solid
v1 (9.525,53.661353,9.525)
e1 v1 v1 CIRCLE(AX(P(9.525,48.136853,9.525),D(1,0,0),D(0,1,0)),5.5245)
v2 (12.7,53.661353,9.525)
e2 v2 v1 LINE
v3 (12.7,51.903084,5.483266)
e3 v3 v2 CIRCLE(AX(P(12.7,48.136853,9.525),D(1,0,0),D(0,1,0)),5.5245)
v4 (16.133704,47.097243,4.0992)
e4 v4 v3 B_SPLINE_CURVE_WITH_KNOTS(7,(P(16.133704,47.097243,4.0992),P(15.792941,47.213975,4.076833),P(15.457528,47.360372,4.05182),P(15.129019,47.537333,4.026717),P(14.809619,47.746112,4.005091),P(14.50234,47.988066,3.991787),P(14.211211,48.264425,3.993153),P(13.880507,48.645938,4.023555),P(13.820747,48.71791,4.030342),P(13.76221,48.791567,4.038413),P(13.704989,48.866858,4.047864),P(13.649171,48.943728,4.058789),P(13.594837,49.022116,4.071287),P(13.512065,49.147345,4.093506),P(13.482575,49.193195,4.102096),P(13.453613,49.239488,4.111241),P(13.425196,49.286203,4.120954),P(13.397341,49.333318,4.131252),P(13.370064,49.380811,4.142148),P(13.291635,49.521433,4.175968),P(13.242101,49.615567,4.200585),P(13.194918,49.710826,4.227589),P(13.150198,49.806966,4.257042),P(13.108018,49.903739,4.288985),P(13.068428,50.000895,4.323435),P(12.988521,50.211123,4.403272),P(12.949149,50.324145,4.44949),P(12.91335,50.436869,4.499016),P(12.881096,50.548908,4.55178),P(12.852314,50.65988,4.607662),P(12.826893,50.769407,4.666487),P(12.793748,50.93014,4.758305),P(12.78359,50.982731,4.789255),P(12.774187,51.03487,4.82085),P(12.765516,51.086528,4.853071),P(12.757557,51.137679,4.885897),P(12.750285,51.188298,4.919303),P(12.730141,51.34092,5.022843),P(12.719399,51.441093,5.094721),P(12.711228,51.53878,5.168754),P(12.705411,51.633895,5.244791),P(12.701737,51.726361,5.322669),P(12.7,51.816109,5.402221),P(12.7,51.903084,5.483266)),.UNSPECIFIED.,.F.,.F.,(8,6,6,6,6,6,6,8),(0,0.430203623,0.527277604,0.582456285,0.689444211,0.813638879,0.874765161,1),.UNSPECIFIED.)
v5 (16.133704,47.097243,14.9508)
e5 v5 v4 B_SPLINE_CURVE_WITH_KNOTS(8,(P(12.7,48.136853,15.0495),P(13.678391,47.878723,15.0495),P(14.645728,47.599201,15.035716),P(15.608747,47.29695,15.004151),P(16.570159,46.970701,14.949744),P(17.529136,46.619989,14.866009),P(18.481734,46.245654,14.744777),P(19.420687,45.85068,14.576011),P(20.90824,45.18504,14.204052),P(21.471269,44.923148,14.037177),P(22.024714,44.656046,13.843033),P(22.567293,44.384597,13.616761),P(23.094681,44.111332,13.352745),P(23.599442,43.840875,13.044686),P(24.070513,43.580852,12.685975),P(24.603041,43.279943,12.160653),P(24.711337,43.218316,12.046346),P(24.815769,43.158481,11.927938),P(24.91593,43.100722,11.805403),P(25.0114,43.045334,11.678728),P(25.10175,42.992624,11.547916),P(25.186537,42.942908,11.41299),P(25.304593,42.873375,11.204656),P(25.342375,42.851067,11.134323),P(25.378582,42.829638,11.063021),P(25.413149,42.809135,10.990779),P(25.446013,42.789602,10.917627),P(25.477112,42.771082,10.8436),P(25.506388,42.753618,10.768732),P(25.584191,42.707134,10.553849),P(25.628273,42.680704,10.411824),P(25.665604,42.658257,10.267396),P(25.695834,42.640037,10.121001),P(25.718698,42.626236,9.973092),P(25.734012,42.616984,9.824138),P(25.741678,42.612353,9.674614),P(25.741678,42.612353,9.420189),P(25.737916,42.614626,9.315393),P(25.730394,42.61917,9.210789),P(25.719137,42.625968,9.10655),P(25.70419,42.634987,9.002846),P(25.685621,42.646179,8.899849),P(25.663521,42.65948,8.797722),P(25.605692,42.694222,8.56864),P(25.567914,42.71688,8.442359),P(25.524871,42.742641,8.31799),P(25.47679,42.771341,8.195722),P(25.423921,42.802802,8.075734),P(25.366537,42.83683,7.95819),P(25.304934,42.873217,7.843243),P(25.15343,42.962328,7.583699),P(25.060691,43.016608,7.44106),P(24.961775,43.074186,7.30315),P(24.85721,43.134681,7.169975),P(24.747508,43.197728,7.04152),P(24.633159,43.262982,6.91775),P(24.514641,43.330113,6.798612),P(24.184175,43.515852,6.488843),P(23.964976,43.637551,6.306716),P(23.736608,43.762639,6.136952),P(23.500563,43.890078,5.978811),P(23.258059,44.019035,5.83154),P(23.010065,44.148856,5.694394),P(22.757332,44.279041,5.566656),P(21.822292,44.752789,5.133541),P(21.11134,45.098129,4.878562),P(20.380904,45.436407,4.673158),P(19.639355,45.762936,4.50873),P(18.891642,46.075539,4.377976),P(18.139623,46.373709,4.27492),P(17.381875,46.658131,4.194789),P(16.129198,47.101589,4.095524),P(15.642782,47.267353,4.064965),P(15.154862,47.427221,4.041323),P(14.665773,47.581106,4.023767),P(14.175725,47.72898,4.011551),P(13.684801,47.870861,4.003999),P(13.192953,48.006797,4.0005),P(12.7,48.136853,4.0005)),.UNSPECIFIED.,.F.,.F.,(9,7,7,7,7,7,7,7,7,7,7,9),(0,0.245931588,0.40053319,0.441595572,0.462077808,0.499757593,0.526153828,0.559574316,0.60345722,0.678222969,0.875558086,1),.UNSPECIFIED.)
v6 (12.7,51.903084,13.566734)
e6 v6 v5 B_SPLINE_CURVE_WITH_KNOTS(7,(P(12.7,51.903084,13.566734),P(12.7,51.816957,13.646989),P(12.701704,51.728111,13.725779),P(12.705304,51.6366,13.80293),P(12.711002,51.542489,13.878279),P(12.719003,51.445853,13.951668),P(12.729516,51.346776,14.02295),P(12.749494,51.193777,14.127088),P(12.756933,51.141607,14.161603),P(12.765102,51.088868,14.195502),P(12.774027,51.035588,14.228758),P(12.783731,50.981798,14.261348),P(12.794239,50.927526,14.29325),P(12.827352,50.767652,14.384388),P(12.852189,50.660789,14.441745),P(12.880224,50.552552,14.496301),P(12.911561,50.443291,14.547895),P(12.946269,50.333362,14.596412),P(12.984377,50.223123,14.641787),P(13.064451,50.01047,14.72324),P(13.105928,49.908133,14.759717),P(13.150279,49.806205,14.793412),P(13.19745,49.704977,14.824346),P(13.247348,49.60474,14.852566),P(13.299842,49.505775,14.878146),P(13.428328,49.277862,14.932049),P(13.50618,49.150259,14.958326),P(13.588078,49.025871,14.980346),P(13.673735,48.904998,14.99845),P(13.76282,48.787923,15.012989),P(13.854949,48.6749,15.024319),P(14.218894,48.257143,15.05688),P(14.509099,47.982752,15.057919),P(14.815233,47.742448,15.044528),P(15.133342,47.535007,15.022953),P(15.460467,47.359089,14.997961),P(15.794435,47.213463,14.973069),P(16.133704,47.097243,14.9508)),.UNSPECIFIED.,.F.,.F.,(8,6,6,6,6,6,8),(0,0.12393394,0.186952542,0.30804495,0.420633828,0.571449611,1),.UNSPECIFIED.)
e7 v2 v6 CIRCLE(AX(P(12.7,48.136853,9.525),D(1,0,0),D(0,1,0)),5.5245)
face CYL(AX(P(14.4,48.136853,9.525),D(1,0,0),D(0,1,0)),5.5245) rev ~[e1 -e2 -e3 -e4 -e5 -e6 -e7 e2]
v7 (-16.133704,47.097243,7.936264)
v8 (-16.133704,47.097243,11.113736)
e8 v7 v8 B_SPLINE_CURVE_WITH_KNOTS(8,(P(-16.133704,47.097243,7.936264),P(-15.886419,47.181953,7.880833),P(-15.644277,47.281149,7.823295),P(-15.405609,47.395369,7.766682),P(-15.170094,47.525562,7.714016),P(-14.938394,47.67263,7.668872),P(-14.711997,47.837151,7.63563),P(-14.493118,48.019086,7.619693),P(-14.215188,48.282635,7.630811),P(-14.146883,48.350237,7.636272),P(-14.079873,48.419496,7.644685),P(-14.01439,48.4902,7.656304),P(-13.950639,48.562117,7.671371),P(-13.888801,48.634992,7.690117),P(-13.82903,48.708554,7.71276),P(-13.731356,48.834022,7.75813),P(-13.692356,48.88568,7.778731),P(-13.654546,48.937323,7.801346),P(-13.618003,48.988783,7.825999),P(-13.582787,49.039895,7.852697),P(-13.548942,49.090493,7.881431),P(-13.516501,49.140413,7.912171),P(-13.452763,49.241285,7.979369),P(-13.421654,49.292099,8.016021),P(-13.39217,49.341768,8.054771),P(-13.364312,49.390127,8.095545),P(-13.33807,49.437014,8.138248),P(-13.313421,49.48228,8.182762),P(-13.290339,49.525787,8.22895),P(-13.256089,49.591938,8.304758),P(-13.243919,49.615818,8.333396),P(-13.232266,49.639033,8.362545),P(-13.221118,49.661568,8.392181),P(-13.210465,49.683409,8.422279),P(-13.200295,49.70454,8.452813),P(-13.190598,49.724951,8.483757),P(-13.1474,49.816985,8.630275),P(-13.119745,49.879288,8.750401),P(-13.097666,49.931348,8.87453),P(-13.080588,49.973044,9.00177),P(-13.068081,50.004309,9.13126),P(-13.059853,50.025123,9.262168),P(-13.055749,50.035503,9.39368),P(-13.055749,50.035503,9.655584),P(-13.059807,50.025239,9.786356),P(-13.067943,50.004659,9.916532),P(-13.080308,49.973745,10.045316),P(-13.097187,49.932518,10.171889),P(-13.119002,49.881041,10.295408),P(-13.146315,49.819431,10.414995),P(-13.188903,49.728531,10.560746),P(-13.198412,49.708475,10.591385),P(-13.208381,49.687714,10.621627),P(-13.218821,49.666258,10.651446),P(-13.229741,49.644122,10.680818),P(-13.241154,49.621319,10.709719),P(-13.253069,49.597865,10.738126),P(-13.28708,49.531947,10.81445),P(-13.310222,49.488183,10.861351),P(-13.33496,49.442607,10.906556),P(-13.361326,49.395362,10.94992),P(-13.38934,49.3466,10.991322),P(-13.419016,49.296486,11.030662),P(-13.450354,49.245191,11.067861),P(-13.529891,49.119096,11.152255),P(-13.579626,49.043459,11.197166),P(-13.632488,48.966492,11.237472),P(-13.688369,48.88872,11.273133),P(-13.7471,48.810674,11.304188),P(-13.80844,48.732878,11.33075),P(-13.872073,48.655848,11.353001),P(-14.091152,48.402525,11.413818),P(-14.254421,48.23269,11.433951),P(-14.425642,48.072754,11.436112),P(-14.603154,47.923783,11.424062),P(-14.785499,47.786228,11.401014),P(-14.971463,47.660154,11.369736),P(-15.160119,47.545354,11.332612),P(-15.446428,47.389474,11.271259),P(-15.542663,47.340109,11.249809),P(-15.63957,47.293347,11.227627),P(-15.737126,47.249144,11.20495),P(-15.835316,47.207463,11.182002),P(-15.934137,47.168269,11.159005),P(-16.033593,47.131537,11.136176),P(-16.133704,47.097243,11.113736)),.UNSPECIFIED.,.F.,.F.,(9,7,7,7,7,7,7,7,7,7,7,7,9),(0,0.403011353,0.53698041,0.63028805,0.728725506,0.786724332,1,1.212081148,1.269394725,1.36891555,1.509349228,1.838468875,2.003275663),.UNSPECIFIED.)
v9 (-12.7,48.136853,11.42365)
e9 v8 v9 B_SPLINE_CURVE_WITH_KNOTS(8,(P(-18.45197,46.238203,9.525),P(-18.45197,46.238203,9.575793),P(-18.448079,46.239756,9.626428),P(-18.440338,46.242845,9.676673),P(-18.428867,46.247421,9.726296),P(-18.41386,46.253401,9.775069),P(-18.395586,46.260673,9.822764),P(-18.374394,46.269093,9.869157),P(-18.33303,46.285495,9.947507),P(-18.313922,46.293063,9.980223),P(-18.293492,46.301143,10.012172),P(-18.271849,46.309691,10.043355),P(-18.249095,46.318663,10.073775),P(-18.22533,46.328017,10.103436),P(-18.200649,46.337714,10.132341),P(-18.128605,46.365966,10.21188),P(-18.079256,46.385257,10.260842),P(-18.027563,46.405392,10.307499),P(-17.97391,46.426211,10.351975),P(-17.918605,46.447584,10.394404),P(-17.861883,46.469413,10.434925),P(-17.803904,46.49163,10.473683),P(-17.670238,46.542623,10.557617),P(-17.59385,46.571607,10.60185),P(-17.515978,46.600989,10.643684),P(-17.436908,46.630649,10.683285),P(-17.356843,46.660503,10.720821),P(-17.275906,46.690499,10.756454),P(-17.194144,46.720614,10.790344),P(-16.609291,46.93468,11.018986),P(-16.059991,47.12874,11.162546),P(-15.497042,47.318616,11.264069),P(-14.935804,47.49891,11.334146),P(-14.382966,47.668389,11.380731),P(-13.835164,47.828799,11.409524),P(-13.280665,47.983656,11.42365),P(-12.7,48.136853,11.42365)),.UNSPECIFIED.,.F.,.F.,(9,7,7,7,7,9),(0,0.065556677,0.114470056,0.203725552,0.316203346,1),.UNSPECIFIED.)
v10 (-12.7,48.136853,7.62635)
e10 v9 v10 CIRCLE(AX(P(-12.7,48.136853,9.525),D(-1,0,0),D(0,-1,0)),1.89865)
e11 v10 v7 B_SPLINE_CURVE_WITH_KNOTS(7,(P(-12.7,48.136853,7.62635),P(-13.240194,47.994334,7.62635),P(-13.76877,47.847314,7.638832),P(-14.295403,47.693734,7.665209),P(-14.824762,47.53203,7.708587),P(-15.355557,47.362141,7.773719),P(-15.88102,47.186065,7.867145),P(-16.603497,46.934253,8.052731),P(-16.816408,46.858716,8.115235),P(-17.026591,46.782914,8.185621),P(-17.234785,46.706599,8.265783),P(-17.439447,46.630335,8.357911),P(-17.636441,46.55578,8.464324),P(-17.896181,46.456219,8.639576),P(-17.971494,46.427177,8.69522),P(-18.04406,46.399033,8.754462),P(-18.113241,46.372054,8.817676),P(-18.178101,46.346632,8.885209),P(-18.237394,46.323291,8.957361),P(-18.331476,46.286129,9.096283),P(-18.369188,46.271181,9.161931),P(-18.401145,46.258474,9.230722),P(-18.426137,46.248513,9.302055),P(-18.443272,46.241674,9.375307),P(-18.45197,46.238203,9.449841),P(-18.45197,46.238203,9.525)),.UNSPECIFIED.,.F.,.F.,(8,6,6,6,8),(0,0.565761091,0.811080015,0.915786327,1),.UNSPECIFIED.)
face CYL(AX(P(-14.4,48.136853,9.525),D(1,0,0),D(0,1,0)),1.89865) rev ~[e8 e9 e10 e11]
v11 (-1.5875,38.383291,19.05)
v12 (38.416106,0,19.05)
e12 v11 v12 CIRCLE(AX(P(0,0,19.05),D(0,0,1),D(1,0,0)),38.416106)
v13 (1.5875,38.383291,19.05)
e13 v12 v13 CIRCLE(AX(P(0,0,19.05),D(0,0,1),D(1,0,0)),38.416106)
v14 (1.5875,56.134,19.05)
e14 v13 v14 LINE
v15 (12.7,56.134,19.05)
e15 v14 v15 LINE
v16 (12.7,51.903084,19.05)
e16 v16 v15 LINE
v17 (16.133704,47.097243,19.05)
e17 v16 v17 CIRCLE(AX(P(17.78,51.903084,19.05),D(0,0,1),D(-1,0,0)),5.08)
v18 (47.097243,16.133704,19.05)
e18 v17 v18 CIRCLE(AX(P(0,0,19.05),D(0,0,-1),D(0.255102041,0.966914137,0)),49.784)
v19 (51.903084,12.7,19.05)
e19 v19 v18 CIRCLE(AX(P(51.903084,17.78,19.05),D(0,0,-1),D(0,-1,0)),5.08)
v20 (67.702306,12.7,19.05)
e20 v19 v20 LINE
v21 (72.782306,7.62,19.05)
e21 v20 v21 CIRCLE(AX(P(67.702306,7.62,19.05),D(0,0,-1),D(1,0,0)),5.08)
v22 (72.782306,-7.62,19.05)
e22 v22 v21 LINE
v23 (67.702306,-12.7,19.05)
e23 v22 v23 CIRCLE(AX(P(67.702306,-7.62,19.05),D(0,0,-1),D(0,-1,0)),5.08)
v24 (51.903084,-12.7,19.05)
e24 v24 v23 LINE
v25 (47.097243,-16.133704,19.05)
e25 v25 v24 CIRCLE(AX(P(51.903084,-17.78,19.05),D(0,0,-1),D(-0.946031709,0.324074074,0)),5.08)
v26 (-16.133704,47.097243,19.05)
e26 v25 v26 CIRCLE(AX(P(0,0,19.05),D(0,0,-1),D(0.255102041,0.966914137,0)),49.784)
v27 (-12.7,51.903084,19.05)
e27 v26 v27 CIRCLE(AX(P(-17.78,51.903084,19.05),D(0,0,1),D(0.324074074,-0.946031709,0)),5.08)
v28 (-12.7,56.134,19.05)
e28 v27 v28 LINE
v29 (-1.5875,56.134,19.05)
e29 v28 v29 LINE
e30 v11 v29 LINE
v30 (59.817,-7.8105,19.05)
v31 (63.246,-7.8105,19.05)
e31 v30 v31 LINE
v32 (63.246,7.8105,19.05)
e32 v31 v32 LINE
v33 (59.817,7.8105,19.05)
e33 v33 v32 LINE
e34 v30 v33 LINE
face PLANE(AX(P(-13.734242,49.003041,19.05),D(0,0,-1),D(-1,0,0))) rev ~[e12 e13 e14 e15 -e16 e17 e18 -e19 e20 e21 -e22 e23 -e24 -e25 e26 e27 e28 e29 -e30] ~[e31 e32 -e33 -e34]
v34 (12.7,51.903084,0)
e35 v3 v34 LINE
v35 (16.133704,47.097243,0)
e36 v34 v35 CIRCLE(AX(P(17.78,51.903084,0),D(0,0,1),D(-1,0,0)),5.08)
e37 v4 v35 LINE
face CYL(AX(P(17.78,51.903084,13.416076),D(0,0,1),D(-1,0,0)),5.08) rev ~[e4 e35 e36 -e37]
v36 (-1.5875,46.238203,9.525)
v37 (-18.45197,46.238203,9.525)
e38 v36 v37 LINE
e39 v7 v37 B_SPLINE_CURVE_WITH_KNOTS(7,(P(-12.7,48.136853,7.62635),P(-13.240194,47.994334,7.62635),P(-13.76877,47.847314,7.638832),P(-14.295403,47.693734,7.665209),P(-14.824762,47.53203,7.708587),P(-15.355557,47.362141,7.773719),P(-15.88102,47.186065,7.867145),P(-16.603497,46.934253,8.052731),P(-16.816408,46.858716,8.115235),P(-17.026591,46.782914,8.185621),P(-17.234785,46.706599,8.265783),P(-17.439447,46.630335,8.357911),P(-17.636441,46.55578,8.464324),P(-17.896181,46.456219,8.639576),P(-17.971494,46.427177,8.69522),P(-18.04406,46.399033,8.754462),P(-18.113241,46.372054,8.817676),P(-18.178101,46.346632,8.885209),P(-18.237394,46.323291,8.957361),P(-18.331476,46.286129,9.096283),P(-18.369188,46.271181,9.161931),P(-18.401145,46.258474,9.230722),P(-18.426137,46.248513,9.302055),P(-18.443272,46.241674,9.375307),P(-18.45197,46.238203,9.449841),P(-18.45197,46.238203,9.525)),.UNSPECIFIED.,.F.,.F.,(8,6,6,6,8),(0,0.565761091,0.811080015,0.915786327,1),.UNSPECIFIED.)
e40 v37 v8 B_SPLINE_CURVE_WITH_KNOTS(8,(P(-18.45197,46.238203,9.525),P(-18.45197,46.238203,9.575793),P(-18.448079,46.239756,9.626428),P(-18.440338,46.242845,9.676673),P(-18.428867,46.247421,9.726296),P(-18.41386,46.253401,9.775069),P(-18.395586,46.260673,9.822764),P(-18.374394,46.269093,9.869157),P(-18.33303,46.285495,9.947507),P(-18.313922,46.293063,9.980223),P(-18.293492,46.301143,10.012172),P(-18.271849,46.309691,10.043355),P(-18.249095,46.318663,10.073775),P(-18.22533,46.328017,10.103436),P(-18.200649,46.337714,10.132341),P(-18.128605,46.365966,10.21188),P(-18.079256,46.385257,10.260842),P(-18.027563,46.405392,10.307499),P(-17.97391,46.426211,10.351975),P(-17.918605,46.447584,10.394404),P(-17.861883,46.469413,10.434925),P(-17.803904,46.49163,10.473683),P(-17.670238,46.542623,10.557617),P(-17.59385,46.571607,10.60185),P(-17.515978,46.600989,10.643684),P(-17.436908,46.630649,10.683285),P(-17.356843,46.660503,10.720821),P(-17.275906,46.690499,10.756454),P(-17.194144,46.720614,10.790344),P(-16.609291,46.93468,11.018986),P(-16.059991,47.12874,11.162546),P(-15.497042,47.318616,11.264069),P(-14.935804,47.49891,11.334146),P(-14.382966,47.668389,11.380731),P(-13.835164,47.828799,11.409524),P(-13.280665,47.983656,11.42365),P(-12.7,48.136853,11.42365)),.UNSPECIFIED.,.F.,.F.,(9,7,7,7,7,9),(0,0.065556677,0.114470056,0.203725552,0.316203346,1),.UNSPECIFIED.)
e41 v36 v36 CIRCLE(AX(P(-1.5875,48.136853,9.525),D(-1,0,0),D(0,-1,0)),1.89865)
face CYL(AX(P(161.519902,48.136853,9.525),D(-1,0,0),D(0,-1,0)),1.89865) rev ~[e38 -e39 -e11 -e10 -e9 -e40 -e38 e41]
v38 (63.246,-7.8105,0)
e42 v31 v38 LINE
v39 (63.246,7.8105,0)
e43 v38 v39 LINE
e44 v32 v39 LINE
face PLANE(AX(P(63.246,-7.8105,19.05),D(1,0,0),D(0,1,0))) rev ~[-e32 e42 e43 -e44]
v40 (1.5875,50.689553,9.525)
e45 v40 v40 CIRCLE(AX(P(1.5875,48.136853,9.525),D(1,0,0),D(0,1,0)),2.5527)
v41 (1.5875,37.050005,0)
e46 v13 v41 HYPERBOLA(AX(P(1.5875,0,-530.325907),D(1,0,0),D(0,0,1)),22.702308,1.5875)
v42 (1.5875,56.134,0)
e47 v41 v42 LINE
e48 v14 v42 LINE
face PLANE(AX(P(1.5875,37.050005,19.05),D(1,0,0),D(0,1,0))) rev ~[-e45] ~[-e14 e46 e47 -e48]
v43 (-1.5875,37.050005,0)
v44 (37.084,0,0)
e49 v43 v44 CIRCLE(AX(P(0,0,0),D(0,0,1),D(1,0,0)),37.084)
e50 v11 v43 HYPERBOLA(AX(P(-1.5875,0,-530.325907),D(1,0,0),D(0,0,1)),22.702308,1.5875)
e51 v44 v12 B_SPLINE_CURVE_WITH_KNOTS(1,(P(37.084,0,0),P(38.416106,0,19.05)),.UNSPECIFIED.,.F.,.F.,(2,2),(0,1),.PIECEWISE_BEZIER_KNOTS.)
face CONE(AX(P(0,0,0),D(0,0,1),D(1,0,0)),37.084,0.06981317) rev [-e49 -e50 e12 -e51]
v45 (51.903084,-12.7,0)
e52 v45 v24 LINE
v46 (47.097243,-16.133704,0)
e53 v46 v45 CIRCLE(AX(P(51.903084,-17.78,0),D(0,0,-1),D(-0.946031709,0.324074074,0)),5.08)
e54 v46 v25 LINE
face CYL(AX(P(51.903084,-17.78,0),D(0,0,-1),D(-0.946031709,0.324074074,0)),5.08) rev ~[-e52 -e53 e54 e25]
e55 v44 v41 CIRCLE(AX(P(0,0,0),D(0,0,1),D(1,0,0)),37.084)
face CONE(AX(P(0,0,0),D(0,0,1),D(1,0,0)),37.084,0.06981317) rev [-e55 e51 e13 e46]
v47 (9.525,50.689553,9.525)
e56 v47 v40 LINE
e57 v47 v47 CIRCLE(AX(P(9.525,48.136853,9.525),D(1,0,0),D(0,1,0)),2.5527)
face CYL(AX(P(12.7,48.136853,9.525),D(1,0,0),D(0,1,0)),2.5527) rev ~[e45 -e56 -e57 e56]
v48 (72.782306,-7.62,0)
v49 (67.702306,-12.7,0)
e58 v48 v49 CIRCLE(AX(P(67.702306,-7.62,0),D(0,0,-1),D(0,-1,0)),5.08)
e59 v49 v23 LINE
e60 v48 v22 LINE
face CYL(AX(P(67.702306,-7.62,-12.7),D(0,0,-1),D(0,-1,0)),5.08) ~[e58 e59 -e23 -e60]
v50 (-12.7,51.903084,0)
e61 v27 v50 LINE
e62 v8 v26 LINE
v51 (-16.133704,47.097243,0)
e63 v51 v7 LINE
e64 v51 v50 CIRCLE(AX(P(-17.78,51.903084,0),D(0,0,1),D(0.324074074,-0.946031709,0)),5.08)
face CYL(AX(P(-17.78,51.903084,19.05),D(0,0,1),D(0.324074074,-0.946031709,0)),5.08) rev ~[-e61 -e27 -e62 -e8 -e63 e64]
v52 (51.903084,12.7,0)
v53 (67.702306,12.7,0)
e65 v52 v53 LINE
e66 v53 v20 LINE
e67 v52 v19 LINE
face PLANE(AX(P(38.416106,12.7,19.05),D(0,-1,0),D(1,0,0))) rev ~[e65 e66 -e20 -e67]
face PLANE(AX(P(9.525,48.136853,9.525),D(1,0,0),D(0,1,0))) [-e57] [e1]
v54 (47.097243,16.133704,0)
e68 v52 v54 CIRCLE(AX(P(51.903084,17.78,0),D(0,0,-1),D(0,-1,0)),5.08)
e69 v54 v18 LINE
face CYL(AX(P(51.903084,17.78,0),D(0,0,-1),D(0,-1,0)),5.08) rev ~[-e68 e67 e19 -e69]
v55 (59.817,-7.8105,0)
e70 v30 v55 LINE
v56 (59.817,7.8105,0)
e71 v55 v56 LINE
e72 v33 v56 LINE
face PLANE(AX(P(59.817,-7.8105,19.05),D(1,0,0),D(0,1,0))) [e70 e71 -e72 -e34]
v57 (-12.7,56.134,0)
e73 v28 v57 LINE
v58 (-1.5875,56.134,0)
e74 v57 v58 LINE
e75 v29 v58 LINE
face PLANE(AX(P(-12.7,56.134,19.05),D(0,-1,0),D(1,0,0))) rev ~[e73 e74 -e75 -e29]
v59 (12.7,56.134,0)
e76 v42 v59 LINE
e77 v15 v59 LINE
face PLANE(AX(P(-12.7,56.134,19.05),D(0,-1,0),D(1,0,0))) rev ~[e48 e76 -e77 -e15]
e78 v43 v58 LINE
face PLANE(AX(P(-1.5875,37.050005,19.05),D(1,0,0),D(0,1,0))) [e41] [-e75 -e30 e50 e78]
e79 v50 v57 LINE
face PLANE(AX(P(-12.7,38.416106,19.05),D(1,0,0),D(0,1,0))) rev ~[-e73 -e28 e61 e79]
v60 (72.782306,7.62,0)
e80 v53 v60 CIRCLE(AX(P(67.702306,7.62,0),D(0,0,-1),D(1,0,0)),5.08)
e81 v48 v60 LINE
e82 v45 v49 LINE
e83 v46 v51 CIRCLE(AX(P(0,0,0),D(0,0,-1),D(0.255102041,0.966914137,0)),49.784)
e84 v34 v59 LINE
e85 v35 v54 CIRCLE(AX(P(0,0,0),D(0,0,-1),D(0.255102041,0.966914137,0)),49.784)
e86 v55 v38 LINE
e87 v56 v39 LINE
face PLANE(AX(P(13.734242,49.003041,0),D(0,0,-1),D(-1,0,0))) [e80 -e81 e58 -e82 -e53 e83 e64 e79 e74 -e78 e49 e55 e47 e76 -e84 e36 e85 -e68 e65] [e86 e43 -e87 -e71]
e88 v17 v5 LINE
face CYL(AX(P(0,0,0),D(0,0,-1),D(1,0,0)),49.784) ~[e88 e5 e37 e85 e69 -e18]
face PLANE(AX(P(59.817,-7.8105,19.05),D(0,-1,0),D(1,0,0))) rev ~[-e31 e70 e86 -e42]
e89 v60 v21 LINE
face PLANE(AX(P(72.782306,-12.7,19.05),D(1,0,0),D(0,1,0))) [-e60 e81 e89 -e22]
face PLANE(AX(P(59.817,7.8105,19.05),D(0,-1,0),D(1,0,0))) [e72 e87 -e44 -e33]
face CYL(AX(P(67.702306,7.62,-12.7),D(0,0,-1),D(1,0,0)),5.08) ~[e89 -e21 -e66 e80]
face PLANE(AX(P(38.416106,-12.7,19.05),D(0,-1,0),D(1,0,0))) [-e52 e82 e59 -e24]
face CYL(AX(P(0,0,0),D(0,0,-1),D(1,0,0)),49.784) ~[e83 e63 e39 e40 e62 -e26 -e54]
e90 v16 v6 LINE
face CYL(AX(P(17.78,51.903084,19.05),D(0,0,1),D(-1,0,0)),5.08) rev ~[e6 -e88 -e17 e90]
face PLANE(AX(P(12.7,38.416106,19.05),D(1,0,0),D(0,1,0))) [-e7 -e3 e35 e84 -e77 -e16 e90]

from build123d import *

# Parameters (mm, degrees)
F0_R           = 49.784
F0_R_2         = 37.084
F1_DEPTH       = 19.05
F2_R           = 37.084
F3_DEPTH       = 19.05
F3_TAPER       = -4
F4_W           = 25.4
F4_H           = 17.7178942325
F5_DEPTH       = 19.05
F6_W           = 3.175
F6_H           = 19.0839946053
F7_DEPTH       = 19.0510001
F8_W           = 34.3662
F8_H           = 25.4
F9_DEPTH       = 19.05
F10_W          = 3.429
F10_H          = 15.621
F11_DEPTH      = 19.0510001
F12_R          = 2.5527
F13_DEPTH      = 11.1125
F13_DEPTH_BACK = 60.0833057675
F14_R          = 5.5245
F15_DEPTH      = 3.175
F15_DEPTH_BACK = 60.0833057675
F17_D          = 3.7973
F18_T1_DEPTH   = 19.05
F18_T6_DEPTH   = 13.4160756928
F18_S7_R       = 5.5245
F18_T8_DEPTH   = 9
F18_T12_DEPTH  = 13.4160756928
F18_S13_R      = 5.5245
F18_T14_DEPTH  = 9
F18_T18_DEPTH  = 17.0419256928
F18_S19_R      = 1.89865
F18_T20_DEPTH  = 11
F18_T24_DEPTH  = 17.0419256928
F18_S25_R      = 1.89865
F18_T26_DEPTH  = 11
F18_T27_DEPTH  = 44.45


# Not quite as in the source:
# - a fillet or chamfer that OpenCascade refuses, or shapes differently, is made with other operations: its cross-section is extruded or revolved along the edge and cut away or added


with BuildPart() as f1:
    # F0 (on Top) → F1 (new body)
    with BuildSketch(Plane.XY):
        Circle(F0_R)
        Circle(F0_R_2, mode=Mode.SUBTRACT)
    extrude(amount=F1_DEPTH)

    # F2 (on face) → F3 (cut)
    with BuildSketch(Plane(origin=(0, 0, 0), x_dir=(1, 0, 0), z_dir=(0, 0, -1))):
        Circle(F2_R)
    extrude(amount=-F3_DEPTH, taper=F3_TAPER, mode=Mode.SUBTRACT)

    # F4 (on face) → F5 (join)
    with BuildSketch(Plane.XY.offset(19.05)):
        with Locations((0, 47.2750528838)):
            Rectangle(F4_W, F4_H)
    extrude(amount=-F5_DEPTH)

    # F6 (on face) → F7 (cut, through all)
    with BuildSketch(Plane.XY.offset(19.05)):
        with Locations((0, 46.5920026974)):
            Rectangle(F6_W, F6_H)
    extrude(amount=-F7_DEPTH, mode=Mode.SUBTRACT)

    # F8 (on face) → F9 (join)
    with BuildSketch(Plane.XY.offset(19.05)):
        with Locations((55.5992057675, 0)):
            Rectangle(F8_W, F8_H)
    extrude(amount=-F9_DEPTH)

    # F10 (on face) → F11 (cut, through all)
    with BuildSketch(Plane.XY.offset(19.05)):
        with Locations((61.5315, 0)):
            Rectangle(F10_W, F10_H)
    extrude(amount=-F11_DEPTH, mode=Mode.SUBTRACT)

    # F12 (on face) → F13 (cut, two sides)
    with BuildSketch(Plane.YZ.offset(12.7)) as f13_sk:
        with Locations((48.1368534078, 9.525)):
            Circle(F12_R)
    extrude(amount=-F13_DEPTH, mode=Mode.SUBTRACT)
    extrude(f13_sk.sketch, amount=F13_DEPTH_BACK, mode=Mode.SUBTRACT)

    # F14 (on face) → F15 (cut, two sides)
    with BuildSketch(Plane.YZ.offset(12.7)) as f15_sk:
        with Locations((48.1368534078, 9.525)):
            Circle(F14_R)
    extrude(amount=-F15_DEPTH, mode=Mode.SUBTRACT)
    extrude(f15_sk.sketch, amount=F15_DEPTH_BACK, mode=Mode.SUBTRACT)

    # F17 (through all)
    with Locations(Plane.YZ.offset(-1.5875)):
        with Locations((48.1368534078, 9.525)):
            Hole(F17_D / 2)

    # F18: fillet of radius 5.08 on 8 edges, made by hand

    # F18_s2 → F18_t1 (join)
    with BuildSketch(Plane.XY):
        with BuildLine():
            ThreePointArc((47.0972426029, -16.1337037037), (48.949846917, -13.6466245522), (51.9030836849, -12.7))
            Line((51.9030836849, -12.7), (48.1368534078, -12.7))
            ThreePointArc((48.1368534078, -12.7), (47.6479888455, -14.4262197049), (47.0972426029, -16.1337037037))
        make_face()
        with BuildLine():
            ThreePointArc((51.9030836849, 12.7), (48.949846917, 13.6466245522), (47.0972426029, 16.1337037037))
            ThreePointArc((47.0972426029, 16.1337037037), (47.6479888455, 14.4262197049), (48.1368534078, 12.7))
            Line((48.1368534078, 12.7), (51.9030836849, 12.7))
        make_face()
    extrude(amount=F18_T1_DEPTH)


with BuildPart() as f18_tool4:
    # F18_s5 → F18_t6 (new body)
    with BuildSketch(Plane.XY.offset(13.4160756928)):
        with BuildLine():
            ThreePointArc((12.7, 51.9030836849), (13.6466245522, 48.949846917), (16.1337037037, 47.0972426029))
            ThreePointArc((16.1337037037, 47.0972426029), (14.4262197049, 47.6479888455), (12.7, 48.1368534078))
            Line((12.7, 48.1368534078), (12.7, 51.9030836849))
        make_face()
    extrude(amount=-F18_T6_DEPTH)

    # F18_s7 → F18_t8 (cut, symmetric)
    with BuildSketch(Plane.YZ.offset(14.4)):
        with Locations((48.1368534078, 9.525)):
            Circle(F18_S7_R)
    extrude(amount=F18_T8_DEPTH, both=True, mode=Mode.SUBTRACT)


with BuildPart() as f1_1:
    add(f1.part)

    # F18_t3: union F18_tool4
    add(f18_tool4.part)


with BuildPart() as f18_tool10:
    # F18_s11 → F18_t12 (new body)
    with BuildSketch(Plane.XY.offset(19.05)):
        with BuildLine():
            ThreePointArc((12.7, 51.9030836849), (13.6466245522, 48.949846917), (16.1337037037, 47.0972426029))
            ThreePointArc((16.1337037037, 47.0972426029), (14.4262197049, 47.6479888455), (12.7, 48.1368534078))
            Line((12.7, 48.1368534078), (12.7, 51.9030836849))
        make_face()
    extrude(amount=-F18_T12_DEPTH)

    # F18_s13 → F18_t14 (cut, symmetric)
    with BuildSketch(Plane.YZ.offset(14.4)):
        with Locations((48.1368534078, 9.525)):
            Circle(F18_S13_R)
    extrude(amount=F18_T14_DEPTH, both=True, mode=Mode.SUBTRACT)


with BuildPart() as f1_2:
    add(f1_1.part)

    # F18_t9: union F18_tool10
    add(f18_tool10.part)


with BuildPart() as f18_tool16:
    # F18_s17 → F18_t18 (new body)
    with BuildSketch(Plane.XY.offset(19.05)):
        with BuildLine():
            ThreePointArc((-16.1337037037, 47.0972426029), (-13.6466245522, 48.949846917), (-12.7, 51.9030836849))
            Line((-12.7, 51.9030836849), (-12.7, 48.1368534078))
            ThreePointArc((-12.7, 48.1368534078), (-14.4262197049, 47.6479888455), (-16.1337037037, 47.0972426029))
        make_face()
    extrude(amount=-F18_T18_DEPTH)

    # F18_s19 → F18_t20 (cut, symmetric)
    with BuildSketch(Plane.YZ.offset(-14.4)):
        with Locations((48.1368534078, 9.525)):
            Circle(F18_S19_R)
    extrude(amount=F18_T20_DEPTH, both=True, mode=Mode.SUBTRACT)


with BuildPart() as f1_3:
    add(f1_2.part)

    # F18_t15: union F18_tool16
    add(f18_tool16.part)


with BuildPart() as f18_tool22:
    # F18_s23 → F18_t24 (new body)
    with BuildSketch(Plane.XY.offset(17.0419256928)):
        with BuildLine():
            ThreePointArc((-16.1337037037, 47.0972426029), (-13.6466245522, 48.949846917), (-12.7, 51.9030836849))
            Line((-12.7, 51.9030836849), (-12.7, 48.1368534078))
            ThreePointArc((-12.7, 48.1368534078), (-14.4262197049, 47.6479888455), (-16.1337037037, 47.0972426029))
        make_face()
    extrude(amount=-F18_T24_DEPTH)

    # F18_s25 → F18_t26 (cut, symmetric)
    with BuildSketch(Plane.YZ.offset(-14.4)):
        with Locations((48.1368534078, 9.525)):
            Circle(F18_S25_R)
    extrude(amount=F18_T26_DEPTH, both=True, mode=Mode.SUBTRACT)


with BuildPart() as f1_4:
    add(f1_3.part)

    # F18_t21: union F18_tool22
    add(f18_tool22.part)

    # F18_s28 → F18_t27 (cut)
    with BuildSketch(Plane.XY.offset(-12.7)):
        with BuildLine():
            ThreePointArc((67.7023057675, -12.7), (71.294408216, -11.2121024484), (72.7823057675, -7.62))
            Line((72.7823057675, -7.62), (72.7823057675, -12.7))
            Line((72.7823057675, -12.7), (67.7023057675, -12.7))
        make_face()
        with BuildLine():
            ThreePointArc((72.7823057675, 7.62), (71.294408216, 11.2121024484), (67.7023057675, 12.7))
            Line((67.7023057675, 12.7), (72.7823057675, 12.7))
            Line((72.7823057675, 12.7), (72.7823057675, 7.62))
        make_face()
    extrude(amount=F18_T27_DEPTH, mode=Mode.SUBTRACT)


solid = f1_4.part
